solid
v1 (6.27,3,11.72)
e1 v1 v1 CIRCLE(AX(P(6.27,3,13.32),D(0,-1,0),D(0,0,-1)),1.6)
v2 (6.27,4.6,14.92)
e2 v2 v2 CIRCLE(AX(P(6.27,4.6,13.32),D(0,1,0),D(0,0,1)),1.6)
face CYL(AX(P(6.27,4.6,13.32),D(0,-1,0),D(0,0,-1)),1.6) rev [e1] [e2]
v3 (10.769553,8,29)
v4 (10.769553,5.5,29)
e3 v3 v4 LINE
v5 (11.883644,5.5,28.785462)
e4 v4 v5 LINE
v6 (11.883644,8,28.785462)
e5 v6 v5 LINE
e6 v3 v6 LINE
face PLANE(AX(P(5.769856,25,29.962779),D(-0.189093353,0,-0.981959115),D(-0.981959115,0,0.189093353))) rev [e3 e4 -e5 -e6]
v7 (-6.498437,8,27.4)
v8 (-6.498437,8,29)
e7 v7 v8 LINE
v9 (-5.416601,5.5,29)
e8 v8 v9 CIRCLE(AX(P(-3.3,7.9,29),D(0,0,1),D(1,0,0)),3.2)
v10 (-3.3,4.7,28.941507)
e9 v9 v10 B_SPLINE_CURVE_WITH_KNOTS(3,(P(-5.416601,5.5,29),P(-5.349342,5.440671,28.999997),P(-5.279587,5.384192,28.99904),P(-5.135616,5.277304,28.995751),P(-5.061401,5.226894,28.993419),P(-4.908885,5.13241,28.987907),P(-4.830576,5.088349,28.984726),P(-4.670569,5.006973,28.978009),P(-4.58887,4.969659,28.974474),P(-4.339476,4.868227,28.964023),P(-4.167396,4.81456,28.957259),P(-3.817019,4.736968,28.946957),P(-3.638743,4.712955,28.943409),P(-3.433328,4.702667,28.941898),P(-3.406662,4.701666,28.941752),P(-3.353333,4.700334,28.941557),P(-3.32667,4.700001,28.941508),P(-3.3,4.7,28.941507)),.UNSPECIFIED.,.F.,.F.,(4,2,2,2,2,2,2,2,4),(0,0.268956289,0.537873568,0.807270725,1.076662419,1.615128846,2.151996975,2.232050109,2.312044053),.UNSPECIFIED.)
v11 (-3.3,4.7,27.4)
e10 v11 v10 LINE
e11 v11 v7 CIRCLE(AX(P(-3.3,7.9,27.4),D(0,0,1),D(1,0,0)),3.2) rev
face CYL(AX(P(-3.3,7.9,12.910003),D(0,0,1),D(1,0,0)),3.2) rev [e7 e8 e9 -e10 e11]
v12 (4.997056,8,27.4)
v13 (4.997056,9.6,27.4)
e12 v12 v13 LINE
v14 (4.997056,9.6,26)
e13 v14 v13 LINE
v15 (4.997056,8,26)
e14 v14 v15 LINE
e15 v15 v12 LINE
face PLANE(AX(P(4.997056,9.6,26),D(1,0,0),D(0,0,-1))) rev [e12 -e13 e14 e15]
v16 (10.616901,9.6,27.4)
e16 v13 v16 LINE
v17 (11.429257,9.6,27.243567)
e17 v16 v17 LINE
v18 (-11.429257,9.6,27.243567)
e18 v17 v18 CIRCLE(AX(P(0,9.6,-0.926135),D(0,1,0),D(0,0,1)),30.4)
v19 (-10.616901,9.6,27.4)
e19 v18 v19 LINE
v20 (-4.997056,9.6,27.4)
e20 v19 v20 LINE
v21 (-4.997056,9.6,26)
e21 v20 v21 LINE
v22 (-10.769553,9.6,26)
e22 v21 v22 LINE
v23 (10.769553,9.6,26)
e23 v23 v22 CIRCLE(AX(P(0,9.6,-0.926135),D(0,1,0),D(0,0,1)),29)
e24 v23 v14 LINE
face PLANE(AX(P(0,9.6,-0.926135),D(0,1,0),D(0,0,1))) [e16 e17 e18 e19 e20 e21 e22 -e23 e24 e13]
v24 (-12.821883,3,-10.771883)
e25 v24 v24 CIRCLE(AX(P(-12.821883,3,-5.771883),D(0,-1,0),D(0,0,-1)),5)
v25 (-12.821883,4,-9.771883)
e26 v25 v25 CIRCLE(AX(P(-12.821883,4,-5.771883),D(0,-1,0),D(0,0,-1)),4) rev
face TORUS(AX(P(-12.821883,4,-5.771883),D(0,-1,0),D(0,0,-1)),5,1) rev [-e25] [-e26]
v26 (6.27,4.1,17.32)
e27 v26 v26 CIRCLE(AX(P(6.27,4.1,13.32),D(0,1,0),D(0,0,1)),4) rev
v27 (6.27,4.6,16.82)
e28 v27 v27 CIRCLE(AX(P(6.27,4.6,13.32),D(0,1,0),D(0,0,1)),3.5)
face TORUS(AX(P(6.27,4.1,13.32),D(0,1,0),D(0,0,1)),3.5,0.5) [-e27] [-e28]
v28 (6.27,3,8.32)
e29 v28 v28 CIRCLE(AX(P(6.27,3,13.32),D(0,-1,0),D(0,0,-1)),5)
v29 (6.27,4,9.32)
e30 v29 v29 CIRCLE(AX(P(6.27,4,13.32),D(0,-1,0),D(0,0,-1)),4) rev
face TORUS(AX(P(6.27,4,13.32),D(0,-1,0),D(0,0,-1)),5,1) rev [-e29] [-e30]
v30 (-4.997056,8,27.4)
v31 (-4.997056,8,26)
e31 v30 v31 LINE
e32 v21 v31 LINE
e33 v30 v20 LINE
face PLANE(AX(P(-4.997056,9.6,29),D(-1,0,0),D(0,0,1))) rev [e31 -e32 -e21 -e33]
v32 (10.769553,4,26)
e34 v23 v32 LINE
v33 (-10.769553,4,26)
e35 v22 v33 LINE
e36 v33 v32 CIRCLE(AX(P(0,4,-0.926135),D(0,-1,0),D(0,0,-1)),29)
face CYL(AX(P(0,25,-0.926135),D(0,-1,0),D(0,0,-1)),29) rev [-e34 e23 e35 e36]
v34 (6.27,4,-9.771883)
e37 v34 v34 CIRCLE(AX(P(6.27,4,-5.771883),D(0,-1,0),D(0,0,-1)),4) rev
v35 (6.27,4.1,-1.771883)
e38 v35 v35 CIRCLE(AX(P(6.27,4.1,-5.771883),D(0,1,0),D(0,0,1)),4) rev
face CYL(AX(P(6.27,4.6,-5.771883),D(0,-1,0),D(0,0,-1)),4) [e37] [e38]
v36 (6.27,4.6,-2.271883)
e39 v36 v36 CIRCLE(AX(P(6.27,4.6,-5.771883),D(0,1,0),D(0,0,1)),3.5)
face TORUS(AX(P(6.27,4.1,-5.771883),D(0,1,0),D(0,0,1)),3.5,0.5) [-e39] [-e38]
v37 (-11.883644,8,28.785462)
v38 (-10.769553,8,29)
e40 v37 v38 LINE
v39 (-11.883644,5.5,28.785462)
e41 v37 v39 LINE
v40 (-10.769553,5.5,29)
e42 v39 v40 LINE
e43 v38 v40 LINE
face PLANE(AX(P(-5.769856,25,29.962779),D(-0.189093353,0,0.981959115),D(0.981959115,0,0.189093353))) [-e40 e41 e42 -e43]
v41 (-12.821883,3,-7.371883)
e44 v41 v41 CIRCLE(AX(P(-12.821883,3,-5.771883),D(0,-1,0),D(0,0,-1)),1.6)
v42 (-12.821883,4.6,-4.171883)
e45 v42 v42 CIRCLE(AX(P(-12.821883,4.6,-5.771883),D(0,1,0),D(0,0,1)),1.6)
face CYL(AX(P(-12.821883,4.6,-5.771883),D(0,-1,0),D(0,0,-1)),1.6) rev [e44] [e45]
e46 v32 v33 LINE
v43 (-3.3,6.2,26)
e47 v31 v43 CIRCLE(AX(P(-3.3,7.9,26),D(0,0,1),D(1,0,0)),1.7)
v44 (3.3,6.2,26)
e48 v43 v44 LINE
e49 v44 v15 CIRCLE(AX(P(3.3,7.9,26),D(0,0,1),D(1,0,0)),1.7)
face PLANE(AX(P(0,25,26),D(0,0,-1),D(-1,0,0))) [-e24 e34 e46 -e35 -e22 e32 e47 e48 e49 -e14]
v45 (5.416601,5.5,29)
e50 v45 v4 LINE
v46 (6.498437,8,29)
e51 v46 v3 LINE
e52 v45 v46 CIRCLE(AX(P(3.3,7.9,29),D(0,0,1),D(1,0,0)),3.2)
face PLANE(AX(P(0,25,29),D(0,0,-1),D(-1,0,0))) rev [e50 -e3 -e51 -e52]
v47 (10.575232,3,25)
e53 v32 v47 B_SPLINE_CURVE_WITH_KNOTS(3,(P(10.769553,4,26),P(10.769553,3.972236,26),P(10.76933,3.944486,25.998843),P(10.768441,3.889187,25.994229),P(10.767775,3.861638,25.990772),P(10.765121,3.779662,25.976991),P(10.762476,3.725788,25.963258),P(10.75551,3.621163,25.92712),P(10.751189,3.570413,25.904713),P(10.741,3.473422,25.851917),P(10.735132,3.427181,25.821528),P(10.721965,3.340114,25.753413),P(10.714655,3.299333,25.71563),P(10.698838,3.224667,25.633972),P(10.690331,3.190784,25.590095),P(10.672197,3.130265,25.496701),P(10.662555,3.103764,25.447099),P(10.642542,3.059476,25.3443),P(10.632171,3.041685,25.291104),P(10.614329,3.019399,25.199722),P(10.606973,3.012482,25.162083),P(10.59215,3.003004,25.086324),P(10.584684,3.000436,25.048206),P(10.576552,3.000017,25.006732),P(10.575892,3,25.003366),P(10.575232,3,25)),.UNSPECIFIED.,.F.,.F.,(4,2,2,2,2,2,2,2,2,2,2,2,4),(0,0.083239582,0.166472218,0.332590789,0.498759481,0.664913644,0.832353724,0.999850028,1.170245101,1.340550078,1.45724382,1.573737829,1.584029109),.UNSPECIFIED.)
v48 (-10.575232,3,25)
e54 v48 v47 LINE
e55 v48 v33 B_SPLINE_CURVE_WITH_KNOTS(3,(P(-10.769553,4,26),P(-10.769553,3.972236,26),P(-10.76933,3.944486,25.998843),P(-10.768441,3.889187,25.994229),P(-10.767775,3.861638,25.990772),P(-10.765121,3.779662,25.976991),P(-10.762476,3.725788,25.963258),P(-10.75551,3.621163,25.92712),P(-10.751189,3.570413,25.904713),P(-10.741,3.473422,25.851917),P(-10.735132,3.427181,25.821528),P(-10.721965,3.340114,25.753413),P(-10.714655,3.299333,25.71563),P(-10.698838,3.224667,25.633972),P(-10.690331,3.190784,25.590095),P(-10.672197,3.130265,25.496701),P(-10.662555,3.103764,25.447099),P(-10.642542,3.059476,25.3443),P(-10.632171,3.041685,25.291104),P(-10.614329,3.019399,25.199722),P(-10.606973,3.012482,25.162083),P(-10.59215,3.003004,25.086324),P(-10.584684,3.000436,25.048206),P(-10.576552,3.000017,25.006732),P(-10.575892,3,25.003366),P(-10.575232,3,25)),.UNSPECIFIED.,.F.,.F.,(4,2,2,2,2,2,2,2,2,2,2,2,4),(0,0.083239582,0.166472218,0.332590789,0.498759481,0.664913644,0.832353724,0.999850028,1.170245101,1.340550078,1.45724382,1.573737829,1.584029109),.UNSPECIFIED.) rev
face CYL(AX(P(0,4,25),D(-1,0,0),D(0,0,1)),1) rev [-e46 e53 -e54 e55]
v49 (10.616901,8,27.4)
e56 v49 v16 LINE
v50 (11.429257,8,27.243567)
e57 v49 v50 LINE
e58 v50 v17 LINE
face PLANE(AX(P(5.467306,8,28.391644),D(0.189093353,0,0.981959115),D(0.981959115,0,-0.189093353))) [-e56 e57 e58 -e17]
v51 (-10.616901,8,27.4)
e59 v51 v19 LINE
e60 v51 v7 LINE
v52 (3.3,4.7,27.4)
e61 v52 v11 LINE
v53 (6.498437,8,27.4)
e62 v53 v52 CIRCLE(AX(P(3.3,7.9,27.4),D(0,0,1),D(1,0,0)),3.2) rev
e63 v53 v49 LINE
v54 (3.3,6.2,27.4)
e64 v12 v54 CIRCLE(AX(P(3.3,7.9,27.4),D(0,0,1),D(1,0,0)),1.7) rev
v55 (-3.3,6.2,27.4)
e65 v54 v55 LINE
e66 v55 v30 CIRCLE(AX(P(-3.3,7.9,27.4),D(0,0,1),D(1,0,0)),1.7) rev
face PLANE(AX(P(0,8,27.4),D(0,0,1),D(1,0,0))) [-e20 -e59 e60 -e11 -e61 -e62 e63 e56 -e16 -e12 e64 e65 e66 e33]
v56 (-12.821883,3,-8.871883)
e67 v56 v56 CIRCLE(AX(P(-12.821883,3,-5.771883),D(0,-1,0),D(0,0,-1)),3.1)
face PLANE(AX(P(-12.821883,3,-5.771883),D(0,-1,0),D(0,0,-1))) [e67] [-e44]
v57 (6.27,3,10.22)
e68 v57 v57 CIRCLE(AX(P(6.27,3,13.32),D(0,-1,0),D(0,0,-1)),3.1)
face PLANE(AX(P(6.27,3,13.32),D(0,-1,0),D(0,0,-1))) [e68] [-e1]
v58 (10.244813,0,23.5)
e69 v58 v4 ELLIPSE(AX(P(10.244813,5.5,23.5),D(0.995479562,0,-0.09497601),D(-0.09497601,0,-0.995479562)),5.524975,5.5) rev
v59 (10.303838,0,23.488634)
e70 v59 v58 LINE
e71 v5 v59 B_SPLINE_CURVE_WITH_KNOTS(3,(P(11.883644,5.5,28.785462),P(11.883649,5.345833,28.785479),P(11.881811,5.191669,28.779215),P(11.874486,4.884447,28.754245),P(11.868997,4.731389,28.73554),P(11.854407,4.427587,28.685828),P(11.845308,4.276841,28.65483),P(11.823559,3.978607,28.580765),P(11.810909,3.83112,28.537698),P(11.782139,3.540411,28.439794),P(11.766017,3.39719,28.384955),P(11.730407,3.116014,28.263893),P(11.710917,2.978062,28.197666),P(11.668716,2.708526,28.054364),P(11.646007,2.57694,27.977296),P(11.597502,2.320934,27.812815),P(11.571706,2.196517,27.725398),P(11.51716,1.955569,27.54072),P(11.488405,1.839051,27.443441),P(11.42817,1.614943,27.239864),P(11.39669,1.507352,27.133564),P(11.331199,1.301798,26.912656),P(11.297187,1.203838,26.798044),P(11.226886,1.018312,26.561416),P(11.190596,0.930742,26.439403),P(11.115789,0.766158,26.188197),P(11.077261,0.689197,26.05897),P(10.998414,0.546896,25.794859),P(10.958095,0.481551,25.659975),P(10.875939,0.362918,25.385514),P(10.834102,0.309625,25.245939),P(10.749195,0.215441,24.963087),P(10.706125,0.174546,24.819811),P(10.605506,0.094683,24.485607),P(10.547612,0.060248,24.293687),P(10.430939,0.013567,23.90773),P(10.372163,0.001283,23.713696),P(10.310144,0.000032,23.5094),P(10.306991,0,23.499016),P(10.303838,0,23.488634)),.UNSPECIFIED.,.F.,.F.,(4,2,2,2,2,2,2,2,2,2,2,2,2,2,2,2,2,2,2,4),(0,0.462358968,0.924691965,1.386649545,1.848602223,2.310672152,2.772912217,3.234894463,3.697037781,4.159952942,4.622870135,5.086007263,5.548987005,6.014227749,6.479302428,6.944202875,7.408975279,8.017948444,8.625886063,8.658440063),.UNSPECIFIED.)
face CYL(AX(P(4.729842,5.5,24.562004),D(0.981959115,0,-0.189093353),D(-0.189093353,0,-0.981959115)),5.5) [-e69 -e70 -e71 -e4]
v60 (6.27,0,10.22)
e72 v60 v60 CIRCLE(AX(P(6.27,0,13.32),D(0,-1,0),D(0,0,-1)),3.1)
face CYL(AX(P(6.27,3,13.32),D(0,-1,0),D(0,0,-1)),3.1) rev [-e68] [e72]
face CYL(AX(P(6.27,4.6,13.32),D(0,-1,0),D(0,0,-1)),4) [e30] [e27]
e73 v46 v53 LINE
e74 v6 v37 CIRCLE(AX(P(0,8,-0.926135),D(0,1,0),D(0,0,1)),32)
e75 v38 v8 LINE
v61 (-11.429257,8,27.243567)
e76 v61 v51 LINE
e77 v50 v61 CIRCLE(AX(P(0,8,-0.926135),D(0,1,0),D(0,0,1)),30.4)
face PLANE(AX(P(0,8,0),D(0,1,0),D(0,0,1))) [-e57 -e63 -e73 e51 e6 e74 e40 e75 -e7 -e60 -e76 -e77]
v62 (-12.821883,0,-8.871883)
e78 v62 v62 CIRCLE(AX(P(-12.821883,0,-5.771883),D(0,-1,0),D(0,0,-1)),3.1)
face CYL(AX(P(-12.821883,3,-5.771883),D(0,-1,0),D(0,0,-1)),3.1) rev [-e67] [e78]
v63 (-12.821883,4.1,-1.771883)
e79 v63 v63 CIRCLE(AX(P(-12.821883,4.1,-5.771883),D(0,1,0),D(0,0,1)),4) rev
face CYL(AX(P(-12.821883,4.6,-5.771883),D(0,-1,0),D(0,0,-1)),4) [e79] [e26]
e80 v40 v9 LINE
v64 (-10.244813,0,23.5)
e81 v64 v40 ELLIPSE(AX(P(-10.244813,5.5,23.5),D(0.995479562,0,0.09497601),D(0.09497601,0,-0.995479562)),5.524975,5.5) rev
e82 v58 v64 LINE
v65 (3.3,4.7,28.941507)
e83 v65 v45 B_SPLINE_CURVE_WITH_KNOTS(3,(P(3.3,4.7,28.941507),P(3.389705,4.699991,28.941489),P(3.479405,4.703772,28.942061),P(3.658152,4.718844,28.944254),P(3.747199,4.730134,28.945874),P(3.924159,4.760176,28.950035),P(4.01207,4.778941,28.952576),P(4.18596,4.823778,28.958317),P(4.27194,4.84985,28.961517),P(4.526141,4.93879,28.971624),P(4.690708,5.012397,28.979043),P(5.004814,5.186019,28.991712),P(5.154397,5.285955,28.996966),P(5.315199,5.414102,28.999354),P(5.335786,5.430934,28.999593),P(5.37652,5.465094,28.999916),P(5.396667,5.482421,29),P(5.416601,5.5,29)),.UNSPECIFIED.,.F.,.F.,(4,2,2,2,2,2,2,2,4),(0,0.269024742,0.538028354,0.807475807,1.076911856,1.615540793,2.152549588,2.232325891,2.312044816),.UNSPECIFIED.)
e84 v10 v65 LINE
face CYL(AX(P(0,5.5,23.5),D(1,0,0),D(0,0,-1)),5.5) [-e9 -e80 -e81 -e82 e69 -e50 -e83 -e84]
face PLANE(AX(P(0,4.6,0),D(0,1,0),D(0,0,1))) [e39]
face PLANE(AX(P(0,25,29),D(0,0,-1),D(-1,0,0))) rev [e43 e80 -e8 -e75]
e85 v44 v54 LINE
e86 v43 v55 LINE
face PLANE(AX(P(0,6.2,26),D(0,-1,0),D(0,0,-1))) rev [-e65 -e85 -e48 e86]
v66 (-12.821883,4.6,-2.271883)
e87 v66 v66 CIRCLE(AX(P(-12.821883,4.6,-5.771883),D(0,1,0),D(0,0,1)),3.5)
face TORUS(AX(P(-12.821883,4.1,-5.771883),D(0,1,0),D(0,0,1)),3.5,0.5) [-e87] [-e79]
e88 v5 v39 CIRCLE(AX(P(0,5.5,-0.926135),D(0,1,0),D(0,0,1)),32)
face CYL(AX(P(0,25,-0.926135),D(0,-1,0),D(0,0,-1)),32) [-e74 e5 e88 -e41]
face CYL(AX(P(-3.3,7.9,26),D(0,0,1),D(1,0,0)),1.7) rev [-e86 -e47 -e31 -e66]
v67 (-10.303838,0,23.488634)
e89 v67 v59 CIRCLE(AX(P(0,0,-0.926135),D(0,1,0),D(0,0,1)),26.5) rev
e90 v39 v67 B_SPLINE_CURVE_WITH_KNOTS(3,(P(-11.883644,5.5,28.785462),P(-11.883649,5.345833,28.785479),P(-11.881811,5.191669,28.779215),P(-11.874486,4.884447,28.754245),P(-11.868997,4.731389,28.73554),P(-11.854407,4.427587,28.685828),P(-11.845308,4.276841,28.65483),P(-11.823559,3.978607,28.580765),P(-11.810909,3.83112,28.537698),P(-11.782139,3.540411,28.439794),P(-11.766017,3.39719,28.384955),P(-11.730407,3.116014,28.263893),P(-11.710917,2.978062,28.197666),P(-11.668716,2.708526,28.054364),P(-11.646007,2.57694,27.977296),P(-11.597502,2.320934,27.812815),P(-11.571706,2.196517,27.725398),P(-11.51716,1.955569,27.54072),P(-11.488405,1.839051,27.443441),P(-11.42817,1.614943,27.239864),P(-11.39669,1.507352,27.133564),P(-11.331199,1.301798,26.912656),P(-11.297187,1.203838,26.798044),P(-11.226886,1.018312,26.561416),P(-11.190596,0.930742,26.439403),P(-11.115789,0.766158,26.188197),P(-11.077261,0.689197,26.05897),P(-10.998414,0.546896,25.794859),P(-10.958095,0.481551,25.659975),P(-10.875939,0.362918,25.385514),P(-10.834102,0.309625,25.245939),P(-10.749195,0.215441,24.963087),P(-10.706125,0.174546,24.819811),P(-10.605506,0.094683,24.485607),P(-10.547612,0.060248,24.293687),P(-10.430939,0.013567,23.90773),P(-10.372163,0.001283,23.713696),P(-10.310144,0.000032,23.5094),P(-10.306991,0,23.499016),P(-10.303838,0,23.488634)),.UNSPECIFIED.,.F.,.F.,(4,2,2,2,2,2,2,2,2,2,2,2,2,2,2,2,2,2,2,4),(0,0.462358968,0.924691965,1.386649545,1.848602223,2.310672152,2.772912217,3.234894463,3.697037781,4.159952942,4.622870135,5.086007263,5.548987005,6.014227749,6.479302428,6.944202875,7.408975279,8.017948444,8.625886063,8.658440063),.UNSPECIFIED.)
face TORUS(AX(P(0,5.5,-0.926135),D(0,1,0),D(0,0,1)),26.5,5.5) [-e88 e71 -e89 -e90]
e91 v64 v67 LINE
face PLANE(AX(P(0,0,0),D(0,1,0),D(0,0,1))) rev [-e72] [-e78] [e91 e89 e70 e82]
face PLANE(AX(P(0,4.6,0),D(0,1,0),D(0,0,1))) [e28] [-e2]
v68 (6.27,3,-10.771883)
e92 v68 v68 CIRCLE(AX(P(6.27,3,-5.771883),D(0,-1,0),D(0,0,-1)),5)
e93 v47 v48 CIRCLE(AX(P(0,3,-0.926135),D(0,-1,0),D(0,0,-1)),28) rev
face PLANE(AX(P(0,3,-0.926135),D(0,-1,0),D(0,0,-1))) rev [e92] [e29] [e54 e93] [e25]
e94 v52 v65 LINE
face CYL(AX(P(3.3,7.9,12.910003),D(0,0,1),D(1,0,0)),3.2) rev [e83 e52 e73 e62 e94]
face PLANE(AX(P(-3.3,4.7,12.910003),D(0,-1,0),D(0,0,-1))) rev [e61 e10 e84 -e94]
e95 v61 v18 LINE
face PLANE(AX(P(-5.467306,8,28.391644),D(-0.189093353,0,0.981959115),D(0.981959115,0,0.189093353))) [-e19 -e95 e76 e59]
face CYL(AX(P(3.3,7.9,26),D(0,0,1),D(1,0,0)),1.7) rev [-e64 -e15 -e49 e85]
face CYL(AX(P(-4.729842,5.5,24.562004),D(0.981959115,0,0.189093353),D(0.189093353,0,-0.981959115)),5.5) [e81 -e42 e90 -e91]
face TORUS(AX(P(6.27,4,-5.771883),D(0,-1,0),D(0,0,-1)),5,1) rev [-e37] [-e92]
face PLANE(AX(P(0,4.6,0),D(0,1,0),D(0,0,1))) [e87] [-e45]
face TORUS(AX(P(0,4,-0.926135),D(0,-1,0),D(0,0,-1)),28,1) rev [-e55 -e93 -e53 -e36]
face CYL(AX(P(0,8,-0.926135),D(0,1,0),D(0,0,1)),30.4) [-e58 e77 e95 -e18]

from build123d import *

# Parameters (mm, degrees)
BOSS_EXTRUDE1_DEPTH = 25
BOSS_EXTRUDE2_START = -3
BOSS_EXTRUDE2_DEPTH = 3
BOSS_EXTRUDE3_DEPTH = 3
CUT_EXTRUDE1_DEPTH  = 3
FILLET1_R           = 5.5
FILLET2_R           = 2
SKETCH6_R           = 4
SKETCH6_R_2         = 1.6
BOSS_EXTRUDE4_DEPTH = 1.6
FILLET3_R           = 1
FILLET4_R           = 0.5
CUT_EXTRUDE2_START  = -3
SKETCH7_R           = 1.6
CUT_EXTRUDE2_DEPTH  = 3
FILLET5_R           = 1
CUT_EXTRUDE3_START  = -17
CUT_EXTRUDE3_DEPTH  = 17
BOSS_EXTRUDE5_DEPTH = 1.6
CUT_EXTRUDE4_START  = -1.6
CUT_EXTRUDE4_DEPTH  = 1.6
SKETCH12_R          = 3.1
CUT_EXTRUDE5_DEPTH  = 3
CUT_EXTRUDE6_DEPTH  = 1.6


with BuildPart() as part:
    # Sketch1 → Boss-Extrude1 (new body)
    with BuildSketch(Plane(origin=(0, 0, 0), x_dir=(1, 0, 0), z_dir=(0, 1, 0))):
        with BuildLine():
            ThreePointArc((-11.883644272, -28.785462223), (0, 32.92613482), (11.883644272, -28.785462223))
            Line((11.883644272, -28.785462223), (10.769552622, -29))
            Line((10.769552622, -29), (-10.769552622, -29))
            Line((-10.769552622, -29), (-11.883644272, -28.785462223))
        make_face()
        with BuildLine():
            Line((-10.769552622, -26), (10.769552622, -26))
            ThreePointArc((10.769552622, -26), (0, 29.92613482), (-10.769552622, -26))
        make_face(mode=Mode.SUBTRACT)
    extrude(amount=BOSS_EXTRUDE1_DEPTH)

    # Sketch2 → Boss-Extrude2 (add)
    with BuildSketch(Plane(origin=(0, 25, 0), x_dir=(1, 0, 0), z_dir=(0, 1, 0)).offset(BOSS_EXTRUDE2_START)):
        with BuildLine():
            Line((10.769552622, -29), (11.883644272, -28.785462223))
            ThreePointArc((11.883644272, -28.785462223), (0, 32.92613482), (-11.883644272, -28.785462223))
            Line((-11.883644272, -28.785462223), (-10.769552622, -29))
            Line((-10.769552622, -29), (10.769552622, -29))
        make_face()
    extrude(amount=BOSS_EXTRUDE2_DEPTH)

    # Sketch3 → Boss-Extrude3 (add)
    with BuildSketch(Plane.XZ):
        with BuildLine():
            Line((10.769552622, 29), (11.883644272, 28.785462223))
            ThreePointArc((11.883644272, 28.785462223), (0, -32.92613482), (-11.883644272, 28.785462223))
            Line((-11.883644272, 28.785462223), (-10.769552622, 29))
            Line((-10.769552622, 29), (10.769552622, 29))
        make_face()
    extrude(amount=-BOSS_EXTRUDE3_DEPTH)

    # Sketch5 → Cut-Extrude1 (cut)
    with BuildSketch(Plane.XY.offset(29)):
        with BuildLine():
            Line((-3.3, 9.6), (3.3, 9.6))
            ThreePointArc((3.3, 9.6), (5, 7.9), (3.3, 6.2))
            Line((3.3, 6.2), (-3.3, 6.2))
            ThreePointArc((-3.3, 6.2), (-5, 7.9), (-3.3, 9.6))
        make_face()
    extrude(amount=-CUT_EXTRUDE1_DEPTH, mode=Mode.SUBTRACT)

    # Fillet1
    # the kernel refuses this fillet: 5.5 mm, written as the material it takes off along each edge
    with BuildSketch(Plane(origin=(2.732385211, 0, 31.600033606), x_dir=(0.18909335316754428, 0, -0.9819591151304897), z_dir=(-0.9819591151304897, 0, -0.1890933531675443)), Plane(origin=(25.385582105, 0, 26.185428617), x_dir=(-0.1890933531675464, 0, -0.9819591151304894), z_dir=(-0.9819591151304893, 0, 0.18909335316754644))) as fillet1_piece_1:
        with BuildLine():
            CenterArc((FILLET1_R, -FILLET1_R), FILLET1_R, 90, 90)
            Line((0, -FILLET1_R), (0, 0))
            Line((0, 0), (FILLET1_R, 0))
        make_face()
    extrude(amount=28.634560119, mode=Mode.SUBTRACT)
    with BuildSketch(Plane(origin=(0, 0, -0.92613482), x_dir=(-0.0031415874858790054, 0, 0.9999950652018582), z_dir=(0.9999950652018582, 0, 0.0031415874858790054))) as fillet1_piece_2:
        with BuildLine():
            CenterArc((32 - FILLET1_R, -FILLET1_R), FILLET1_R, 0, 90)
            Line((32 - FILLET1_R, 0), (32, 0))
            Line((32, 0), (32, -FILLET1_R))
        make_face()
    revolve(axis=Axis((0, 0, -0.92613482), (0, -1, 0)), revolution_arc=359.64, mode=Mode.SUBTRACT)
    with BuildSketch(Plane(origin=(24.519552622, 0, 29), x_dir=(0, 0, -1), z_dir=(-1, 0, 0))) as fillet1_piece_3:
        with BuildLine():
            CenterArc((FILLET1_R, -FILLET1_R), FILLET1_R, 90, 90)
            Line((0, -FILLET1_R), (0, 0))
            Line((0, 0), (FILLET1_R, 0))
        make_face()
    extrude(amount=49.039105243, mode=Mode.SUBTRACT)

    # Fillet2
    fillet2_edges = [part.edges().sort_by_distance(p)[0] for p in [
        (-11.326598447, 25, 28.892731111),
        (0, 25, 29),
        (11.326598447, 25, 28.892731111),
        (0, 25, -32.92613482),
    ]]
    fillet(fillet2_edges, radius=FILLET2_R)

    # Sketch6 → Boss-Extrude4 (add)
    # profile 1 of 3: a face of its own
    with BuildSketch(Plane(origin=(0, 3, 0), x_dir=(1, 0, 0), z_dir=(0, 1, 0))):
        with Locations(Location((-12.821883092, 5.771883092, 0), (0, 0, 90))):
            Circle(SKETCH6_R)
        with Locations(Location((-12.821883092, 5.771883092, 0), (0, 0, 270))):
            Circle(SKETCH6_R_2, mode=Mode.SUBTRACT)
    # profile 2 of 3: a face of its own
    with BuildSketch(Plane(origin=(0, 3, 0), x_dir=(1, 0, 0), z_dir=(0, 1, 0))):
        with Locations(Location((6.27, 5.771883092, 0), (0, 0, 90))):
            Circle(SKETCH6_R)
    # profile 3 of 3: a face of its own
    with BuildSketch(Plane(origin=(0, 3, 0), x_dir=(1, 0, 0), z_dir=(0, 1, 0))):
        with Locations(Location((6.27, -13.32, 0), (0, 0, 90))):
            Circle(SKETCH6_R)
        with Locations(Location((6.27, -13.32, 0), (0, 0, 270))):
            Circle(SKETCH6_R_2, mode=Mode.SUBTRACT)
    extrude(amount=BOSS_EXTRUDE4_DEPTH)

    # Fillet3
    fillet3_edges = [part.edges().sort_by_distance(p)[0] for p in [
        (-12.821883092, 3, -1.771883092),
        (6.27, 3, -1.771883092),
        (6.27, 3, 17.32),
    ]]
    fillet(fillet3_edges, radius=FILLET3_R)

    # Fillet4
    fillet4_edges = [part.edges().sort_by_distance(p)[0] for p in [
        (-12.821883092, 4.6, -1.771883092),
        (6.27, 4.6, -1.771883092),
        (6.27, 4.6, 17.32),
    ]]
    fillet(fillet4_edges, radius=FILLET4_R)

    # Sketch7 → Cut-Extrude2 (cut)
    with BuildSketch(Plane(origin=(0, 3, 0), x_dir=(1, 0, 0), z_dir=(0, 1, 0)).offset(CUT_EXTRUDE2_START)):
        with Locations(Location((6.27, -13.32, 0), (0, 0, 270))):
            Circle(SKETCH7_R)
        with Locations(Location((-12.821883092, 5.771883092, 0), (0, 0, 270))):
            Circle(SKETCH7_R)
    extrude(amount=CUT_EXTRUDE2_DEPTH, mode=Mode.SUBTRACT)

    # Fillet5
    fillet5_edges = [part.edges().sort_by_distance(p)[0] for p in [
        (0, 3, 26),
        (0, 3, -29.92613482),
    ]]
    fillet(fillet5_edges, radius=FILLET5_R)

    # Sketch8 → Cut-Extrude3 (cut)
    with BuildSketch(Plane(origin=(0, 25, 0), x_dir=(1, 0, 0), z_dir=(0, 1, 0)).offset(CUT_EXTRUDE3_START)):
        with BuildLine():
            Line((11.883644272, -28.785462223), (10.769552622, -29))
            Line((10.769552622, -29), (-10.769552622, -29))
            Line((-10.769552622, -29), (-11.883644272, -28.785462223))
            ThreePointArc((-11.883644272, -28.785462223), (0, 32.92613482), (11.883644272, -28.785462223))
        make_face()
    extrude(amount=CUT_EXTRUDE3_DEPTH, mode=Mode.SUBTRACT)

    # Sketch9 → Boss-Extrude5 (add)
    with BuildSketch(Plane(origin=(0, 8, 0), x_dir=(1, 0, 0), z_dir=(0, 1, 0))):
        with BuildLine():
            Line((-4.997056275, -26), (-10.769552622, -26))
            ThreePointArc((-10.769552622, -26), (0, 29.92613482), (10.769552622, -26))
            Line((10.769552622, -26), (4.997056275, -26))
            Line((4.997056275, -26), (4.997056275, -29))
            Line((4.997056275, -29), (10.769552622, -29))
            Line((10.769552622, -29), (11.883644272, -28.785462223))
            ThreePointArc((11.883644272, -28.785462223), (0, 32.92613482), (-11.883644272, -28.785462223))
            Line((-11.883644272, -28.785462223), (-10.769552622, -29))
            Line((-10.769552622, -29), (-4.997056275, -29))
            Line((-4.997056275, -29), (-4.997056275, -26))
        make_face()
    extrude(amount=BOSS_EXTRUDE5_DEPTH)

    # Sketch11 → Cut-Extrude4 (cut)
    with BuildSketch(Plane(origin=(0, 9.6, 0), x_dir=(1, 0, 0), z_dir=(0, 1, 0)).offset(CUT_EXTRUDE4_START)):
        with BuildLine():
            ThreePointArc((11.883644272, -28.785462223), (0, 32.92613482), (-11.883644272, -28.785462223))
            Line((-11.883644272, -28.785462223), (-10.769552622, -29))
            Line((-10.769552622, -29), (-5, -29))
            Line((-5, -29), (-4.997056275, -29))
            Line((-4.997056275, -29), (-4.997056275, -27.4))
            Line((-4.997056275, -27.4), (-5, -27.4))
            Line((-5, -27.4), (-10.616900954, -27.4))
            Line((-10.616900954, -27.4), (-11.429257174, -27.243566642))
            ThreePointArc((-11.429257174, -27.243566642), (0, 31.32613482), (11.429257174, -27.243566642))
            Line((11.429257174, -27.243566642), (10.616900954, -27.4))
            Line((10.616900954, -27.4), (5, -27.4))
            Line((5, -27.4), (4.997056275, -27.4))
            Line((4.997056275, -27.4), (4.997056275, -29))
            Line((4.997056275, -29), (5, -29))
            Line((5, -29), (10.769552622, -29))
            Line((10.769552622, -29), (11.883644272, -28.785462223))
        make_face()
    extrude(amount=CUT_EXTRUDE4_DEPTH, mode=Mode.SUBTRACT)

    # Sketch12 → Cut-Extrude5 (cut)
    with BuildSketch(Plane.XZ):
        with Locations(Location((-12.821883092, -5.771883092, 0), (0, 0, 270))):
            Circle(SKETCH12_R)
        with Locations(Location((6.27, 13.32, 0), (0, 0, 270))):
            Circle(SKETCH12_R)
    extrude(amount=-CUT_EXTRUDE5_DEPTH, mode=Mode.SUBTRACT)

    # Sketch5<3> → Cut-Extrude6 (cut)
    with BuildSketch(Plane.XY.offset(29)):
        with BuildLine():
            Line((-3.3, 11.1), (3.3, 11.1))
            ThreePointArc((3.3, 11.1), (6.5, 7.9), (3.3, 4.7))
            Line((3.3, 4.7), (-3.3, 4.7))
            ThreePointArc((-3.3, 4.7), (-6.5, 7.9), (-3.3, 11.1))
        make_face()
        with BuildLine():
            Line((-3.3, 9.6), (3.3, 9.6))
            ThreePointArc((3.3, 9.6), (5, 7.9), (3.3, 6.2))
            Line((3.3, 6.2), (-3.3, 6.2))
            ThreePointArc((-3.3, 6.2), (-5, 7.9), (-3.3, 9.6))
        make_face(mode=Mode.SUBTRACT)
    extrude(amount=-CUT_EXTRUDE6_DEPTH, mode=Mode.SUBTRACT)


solid = part.part
